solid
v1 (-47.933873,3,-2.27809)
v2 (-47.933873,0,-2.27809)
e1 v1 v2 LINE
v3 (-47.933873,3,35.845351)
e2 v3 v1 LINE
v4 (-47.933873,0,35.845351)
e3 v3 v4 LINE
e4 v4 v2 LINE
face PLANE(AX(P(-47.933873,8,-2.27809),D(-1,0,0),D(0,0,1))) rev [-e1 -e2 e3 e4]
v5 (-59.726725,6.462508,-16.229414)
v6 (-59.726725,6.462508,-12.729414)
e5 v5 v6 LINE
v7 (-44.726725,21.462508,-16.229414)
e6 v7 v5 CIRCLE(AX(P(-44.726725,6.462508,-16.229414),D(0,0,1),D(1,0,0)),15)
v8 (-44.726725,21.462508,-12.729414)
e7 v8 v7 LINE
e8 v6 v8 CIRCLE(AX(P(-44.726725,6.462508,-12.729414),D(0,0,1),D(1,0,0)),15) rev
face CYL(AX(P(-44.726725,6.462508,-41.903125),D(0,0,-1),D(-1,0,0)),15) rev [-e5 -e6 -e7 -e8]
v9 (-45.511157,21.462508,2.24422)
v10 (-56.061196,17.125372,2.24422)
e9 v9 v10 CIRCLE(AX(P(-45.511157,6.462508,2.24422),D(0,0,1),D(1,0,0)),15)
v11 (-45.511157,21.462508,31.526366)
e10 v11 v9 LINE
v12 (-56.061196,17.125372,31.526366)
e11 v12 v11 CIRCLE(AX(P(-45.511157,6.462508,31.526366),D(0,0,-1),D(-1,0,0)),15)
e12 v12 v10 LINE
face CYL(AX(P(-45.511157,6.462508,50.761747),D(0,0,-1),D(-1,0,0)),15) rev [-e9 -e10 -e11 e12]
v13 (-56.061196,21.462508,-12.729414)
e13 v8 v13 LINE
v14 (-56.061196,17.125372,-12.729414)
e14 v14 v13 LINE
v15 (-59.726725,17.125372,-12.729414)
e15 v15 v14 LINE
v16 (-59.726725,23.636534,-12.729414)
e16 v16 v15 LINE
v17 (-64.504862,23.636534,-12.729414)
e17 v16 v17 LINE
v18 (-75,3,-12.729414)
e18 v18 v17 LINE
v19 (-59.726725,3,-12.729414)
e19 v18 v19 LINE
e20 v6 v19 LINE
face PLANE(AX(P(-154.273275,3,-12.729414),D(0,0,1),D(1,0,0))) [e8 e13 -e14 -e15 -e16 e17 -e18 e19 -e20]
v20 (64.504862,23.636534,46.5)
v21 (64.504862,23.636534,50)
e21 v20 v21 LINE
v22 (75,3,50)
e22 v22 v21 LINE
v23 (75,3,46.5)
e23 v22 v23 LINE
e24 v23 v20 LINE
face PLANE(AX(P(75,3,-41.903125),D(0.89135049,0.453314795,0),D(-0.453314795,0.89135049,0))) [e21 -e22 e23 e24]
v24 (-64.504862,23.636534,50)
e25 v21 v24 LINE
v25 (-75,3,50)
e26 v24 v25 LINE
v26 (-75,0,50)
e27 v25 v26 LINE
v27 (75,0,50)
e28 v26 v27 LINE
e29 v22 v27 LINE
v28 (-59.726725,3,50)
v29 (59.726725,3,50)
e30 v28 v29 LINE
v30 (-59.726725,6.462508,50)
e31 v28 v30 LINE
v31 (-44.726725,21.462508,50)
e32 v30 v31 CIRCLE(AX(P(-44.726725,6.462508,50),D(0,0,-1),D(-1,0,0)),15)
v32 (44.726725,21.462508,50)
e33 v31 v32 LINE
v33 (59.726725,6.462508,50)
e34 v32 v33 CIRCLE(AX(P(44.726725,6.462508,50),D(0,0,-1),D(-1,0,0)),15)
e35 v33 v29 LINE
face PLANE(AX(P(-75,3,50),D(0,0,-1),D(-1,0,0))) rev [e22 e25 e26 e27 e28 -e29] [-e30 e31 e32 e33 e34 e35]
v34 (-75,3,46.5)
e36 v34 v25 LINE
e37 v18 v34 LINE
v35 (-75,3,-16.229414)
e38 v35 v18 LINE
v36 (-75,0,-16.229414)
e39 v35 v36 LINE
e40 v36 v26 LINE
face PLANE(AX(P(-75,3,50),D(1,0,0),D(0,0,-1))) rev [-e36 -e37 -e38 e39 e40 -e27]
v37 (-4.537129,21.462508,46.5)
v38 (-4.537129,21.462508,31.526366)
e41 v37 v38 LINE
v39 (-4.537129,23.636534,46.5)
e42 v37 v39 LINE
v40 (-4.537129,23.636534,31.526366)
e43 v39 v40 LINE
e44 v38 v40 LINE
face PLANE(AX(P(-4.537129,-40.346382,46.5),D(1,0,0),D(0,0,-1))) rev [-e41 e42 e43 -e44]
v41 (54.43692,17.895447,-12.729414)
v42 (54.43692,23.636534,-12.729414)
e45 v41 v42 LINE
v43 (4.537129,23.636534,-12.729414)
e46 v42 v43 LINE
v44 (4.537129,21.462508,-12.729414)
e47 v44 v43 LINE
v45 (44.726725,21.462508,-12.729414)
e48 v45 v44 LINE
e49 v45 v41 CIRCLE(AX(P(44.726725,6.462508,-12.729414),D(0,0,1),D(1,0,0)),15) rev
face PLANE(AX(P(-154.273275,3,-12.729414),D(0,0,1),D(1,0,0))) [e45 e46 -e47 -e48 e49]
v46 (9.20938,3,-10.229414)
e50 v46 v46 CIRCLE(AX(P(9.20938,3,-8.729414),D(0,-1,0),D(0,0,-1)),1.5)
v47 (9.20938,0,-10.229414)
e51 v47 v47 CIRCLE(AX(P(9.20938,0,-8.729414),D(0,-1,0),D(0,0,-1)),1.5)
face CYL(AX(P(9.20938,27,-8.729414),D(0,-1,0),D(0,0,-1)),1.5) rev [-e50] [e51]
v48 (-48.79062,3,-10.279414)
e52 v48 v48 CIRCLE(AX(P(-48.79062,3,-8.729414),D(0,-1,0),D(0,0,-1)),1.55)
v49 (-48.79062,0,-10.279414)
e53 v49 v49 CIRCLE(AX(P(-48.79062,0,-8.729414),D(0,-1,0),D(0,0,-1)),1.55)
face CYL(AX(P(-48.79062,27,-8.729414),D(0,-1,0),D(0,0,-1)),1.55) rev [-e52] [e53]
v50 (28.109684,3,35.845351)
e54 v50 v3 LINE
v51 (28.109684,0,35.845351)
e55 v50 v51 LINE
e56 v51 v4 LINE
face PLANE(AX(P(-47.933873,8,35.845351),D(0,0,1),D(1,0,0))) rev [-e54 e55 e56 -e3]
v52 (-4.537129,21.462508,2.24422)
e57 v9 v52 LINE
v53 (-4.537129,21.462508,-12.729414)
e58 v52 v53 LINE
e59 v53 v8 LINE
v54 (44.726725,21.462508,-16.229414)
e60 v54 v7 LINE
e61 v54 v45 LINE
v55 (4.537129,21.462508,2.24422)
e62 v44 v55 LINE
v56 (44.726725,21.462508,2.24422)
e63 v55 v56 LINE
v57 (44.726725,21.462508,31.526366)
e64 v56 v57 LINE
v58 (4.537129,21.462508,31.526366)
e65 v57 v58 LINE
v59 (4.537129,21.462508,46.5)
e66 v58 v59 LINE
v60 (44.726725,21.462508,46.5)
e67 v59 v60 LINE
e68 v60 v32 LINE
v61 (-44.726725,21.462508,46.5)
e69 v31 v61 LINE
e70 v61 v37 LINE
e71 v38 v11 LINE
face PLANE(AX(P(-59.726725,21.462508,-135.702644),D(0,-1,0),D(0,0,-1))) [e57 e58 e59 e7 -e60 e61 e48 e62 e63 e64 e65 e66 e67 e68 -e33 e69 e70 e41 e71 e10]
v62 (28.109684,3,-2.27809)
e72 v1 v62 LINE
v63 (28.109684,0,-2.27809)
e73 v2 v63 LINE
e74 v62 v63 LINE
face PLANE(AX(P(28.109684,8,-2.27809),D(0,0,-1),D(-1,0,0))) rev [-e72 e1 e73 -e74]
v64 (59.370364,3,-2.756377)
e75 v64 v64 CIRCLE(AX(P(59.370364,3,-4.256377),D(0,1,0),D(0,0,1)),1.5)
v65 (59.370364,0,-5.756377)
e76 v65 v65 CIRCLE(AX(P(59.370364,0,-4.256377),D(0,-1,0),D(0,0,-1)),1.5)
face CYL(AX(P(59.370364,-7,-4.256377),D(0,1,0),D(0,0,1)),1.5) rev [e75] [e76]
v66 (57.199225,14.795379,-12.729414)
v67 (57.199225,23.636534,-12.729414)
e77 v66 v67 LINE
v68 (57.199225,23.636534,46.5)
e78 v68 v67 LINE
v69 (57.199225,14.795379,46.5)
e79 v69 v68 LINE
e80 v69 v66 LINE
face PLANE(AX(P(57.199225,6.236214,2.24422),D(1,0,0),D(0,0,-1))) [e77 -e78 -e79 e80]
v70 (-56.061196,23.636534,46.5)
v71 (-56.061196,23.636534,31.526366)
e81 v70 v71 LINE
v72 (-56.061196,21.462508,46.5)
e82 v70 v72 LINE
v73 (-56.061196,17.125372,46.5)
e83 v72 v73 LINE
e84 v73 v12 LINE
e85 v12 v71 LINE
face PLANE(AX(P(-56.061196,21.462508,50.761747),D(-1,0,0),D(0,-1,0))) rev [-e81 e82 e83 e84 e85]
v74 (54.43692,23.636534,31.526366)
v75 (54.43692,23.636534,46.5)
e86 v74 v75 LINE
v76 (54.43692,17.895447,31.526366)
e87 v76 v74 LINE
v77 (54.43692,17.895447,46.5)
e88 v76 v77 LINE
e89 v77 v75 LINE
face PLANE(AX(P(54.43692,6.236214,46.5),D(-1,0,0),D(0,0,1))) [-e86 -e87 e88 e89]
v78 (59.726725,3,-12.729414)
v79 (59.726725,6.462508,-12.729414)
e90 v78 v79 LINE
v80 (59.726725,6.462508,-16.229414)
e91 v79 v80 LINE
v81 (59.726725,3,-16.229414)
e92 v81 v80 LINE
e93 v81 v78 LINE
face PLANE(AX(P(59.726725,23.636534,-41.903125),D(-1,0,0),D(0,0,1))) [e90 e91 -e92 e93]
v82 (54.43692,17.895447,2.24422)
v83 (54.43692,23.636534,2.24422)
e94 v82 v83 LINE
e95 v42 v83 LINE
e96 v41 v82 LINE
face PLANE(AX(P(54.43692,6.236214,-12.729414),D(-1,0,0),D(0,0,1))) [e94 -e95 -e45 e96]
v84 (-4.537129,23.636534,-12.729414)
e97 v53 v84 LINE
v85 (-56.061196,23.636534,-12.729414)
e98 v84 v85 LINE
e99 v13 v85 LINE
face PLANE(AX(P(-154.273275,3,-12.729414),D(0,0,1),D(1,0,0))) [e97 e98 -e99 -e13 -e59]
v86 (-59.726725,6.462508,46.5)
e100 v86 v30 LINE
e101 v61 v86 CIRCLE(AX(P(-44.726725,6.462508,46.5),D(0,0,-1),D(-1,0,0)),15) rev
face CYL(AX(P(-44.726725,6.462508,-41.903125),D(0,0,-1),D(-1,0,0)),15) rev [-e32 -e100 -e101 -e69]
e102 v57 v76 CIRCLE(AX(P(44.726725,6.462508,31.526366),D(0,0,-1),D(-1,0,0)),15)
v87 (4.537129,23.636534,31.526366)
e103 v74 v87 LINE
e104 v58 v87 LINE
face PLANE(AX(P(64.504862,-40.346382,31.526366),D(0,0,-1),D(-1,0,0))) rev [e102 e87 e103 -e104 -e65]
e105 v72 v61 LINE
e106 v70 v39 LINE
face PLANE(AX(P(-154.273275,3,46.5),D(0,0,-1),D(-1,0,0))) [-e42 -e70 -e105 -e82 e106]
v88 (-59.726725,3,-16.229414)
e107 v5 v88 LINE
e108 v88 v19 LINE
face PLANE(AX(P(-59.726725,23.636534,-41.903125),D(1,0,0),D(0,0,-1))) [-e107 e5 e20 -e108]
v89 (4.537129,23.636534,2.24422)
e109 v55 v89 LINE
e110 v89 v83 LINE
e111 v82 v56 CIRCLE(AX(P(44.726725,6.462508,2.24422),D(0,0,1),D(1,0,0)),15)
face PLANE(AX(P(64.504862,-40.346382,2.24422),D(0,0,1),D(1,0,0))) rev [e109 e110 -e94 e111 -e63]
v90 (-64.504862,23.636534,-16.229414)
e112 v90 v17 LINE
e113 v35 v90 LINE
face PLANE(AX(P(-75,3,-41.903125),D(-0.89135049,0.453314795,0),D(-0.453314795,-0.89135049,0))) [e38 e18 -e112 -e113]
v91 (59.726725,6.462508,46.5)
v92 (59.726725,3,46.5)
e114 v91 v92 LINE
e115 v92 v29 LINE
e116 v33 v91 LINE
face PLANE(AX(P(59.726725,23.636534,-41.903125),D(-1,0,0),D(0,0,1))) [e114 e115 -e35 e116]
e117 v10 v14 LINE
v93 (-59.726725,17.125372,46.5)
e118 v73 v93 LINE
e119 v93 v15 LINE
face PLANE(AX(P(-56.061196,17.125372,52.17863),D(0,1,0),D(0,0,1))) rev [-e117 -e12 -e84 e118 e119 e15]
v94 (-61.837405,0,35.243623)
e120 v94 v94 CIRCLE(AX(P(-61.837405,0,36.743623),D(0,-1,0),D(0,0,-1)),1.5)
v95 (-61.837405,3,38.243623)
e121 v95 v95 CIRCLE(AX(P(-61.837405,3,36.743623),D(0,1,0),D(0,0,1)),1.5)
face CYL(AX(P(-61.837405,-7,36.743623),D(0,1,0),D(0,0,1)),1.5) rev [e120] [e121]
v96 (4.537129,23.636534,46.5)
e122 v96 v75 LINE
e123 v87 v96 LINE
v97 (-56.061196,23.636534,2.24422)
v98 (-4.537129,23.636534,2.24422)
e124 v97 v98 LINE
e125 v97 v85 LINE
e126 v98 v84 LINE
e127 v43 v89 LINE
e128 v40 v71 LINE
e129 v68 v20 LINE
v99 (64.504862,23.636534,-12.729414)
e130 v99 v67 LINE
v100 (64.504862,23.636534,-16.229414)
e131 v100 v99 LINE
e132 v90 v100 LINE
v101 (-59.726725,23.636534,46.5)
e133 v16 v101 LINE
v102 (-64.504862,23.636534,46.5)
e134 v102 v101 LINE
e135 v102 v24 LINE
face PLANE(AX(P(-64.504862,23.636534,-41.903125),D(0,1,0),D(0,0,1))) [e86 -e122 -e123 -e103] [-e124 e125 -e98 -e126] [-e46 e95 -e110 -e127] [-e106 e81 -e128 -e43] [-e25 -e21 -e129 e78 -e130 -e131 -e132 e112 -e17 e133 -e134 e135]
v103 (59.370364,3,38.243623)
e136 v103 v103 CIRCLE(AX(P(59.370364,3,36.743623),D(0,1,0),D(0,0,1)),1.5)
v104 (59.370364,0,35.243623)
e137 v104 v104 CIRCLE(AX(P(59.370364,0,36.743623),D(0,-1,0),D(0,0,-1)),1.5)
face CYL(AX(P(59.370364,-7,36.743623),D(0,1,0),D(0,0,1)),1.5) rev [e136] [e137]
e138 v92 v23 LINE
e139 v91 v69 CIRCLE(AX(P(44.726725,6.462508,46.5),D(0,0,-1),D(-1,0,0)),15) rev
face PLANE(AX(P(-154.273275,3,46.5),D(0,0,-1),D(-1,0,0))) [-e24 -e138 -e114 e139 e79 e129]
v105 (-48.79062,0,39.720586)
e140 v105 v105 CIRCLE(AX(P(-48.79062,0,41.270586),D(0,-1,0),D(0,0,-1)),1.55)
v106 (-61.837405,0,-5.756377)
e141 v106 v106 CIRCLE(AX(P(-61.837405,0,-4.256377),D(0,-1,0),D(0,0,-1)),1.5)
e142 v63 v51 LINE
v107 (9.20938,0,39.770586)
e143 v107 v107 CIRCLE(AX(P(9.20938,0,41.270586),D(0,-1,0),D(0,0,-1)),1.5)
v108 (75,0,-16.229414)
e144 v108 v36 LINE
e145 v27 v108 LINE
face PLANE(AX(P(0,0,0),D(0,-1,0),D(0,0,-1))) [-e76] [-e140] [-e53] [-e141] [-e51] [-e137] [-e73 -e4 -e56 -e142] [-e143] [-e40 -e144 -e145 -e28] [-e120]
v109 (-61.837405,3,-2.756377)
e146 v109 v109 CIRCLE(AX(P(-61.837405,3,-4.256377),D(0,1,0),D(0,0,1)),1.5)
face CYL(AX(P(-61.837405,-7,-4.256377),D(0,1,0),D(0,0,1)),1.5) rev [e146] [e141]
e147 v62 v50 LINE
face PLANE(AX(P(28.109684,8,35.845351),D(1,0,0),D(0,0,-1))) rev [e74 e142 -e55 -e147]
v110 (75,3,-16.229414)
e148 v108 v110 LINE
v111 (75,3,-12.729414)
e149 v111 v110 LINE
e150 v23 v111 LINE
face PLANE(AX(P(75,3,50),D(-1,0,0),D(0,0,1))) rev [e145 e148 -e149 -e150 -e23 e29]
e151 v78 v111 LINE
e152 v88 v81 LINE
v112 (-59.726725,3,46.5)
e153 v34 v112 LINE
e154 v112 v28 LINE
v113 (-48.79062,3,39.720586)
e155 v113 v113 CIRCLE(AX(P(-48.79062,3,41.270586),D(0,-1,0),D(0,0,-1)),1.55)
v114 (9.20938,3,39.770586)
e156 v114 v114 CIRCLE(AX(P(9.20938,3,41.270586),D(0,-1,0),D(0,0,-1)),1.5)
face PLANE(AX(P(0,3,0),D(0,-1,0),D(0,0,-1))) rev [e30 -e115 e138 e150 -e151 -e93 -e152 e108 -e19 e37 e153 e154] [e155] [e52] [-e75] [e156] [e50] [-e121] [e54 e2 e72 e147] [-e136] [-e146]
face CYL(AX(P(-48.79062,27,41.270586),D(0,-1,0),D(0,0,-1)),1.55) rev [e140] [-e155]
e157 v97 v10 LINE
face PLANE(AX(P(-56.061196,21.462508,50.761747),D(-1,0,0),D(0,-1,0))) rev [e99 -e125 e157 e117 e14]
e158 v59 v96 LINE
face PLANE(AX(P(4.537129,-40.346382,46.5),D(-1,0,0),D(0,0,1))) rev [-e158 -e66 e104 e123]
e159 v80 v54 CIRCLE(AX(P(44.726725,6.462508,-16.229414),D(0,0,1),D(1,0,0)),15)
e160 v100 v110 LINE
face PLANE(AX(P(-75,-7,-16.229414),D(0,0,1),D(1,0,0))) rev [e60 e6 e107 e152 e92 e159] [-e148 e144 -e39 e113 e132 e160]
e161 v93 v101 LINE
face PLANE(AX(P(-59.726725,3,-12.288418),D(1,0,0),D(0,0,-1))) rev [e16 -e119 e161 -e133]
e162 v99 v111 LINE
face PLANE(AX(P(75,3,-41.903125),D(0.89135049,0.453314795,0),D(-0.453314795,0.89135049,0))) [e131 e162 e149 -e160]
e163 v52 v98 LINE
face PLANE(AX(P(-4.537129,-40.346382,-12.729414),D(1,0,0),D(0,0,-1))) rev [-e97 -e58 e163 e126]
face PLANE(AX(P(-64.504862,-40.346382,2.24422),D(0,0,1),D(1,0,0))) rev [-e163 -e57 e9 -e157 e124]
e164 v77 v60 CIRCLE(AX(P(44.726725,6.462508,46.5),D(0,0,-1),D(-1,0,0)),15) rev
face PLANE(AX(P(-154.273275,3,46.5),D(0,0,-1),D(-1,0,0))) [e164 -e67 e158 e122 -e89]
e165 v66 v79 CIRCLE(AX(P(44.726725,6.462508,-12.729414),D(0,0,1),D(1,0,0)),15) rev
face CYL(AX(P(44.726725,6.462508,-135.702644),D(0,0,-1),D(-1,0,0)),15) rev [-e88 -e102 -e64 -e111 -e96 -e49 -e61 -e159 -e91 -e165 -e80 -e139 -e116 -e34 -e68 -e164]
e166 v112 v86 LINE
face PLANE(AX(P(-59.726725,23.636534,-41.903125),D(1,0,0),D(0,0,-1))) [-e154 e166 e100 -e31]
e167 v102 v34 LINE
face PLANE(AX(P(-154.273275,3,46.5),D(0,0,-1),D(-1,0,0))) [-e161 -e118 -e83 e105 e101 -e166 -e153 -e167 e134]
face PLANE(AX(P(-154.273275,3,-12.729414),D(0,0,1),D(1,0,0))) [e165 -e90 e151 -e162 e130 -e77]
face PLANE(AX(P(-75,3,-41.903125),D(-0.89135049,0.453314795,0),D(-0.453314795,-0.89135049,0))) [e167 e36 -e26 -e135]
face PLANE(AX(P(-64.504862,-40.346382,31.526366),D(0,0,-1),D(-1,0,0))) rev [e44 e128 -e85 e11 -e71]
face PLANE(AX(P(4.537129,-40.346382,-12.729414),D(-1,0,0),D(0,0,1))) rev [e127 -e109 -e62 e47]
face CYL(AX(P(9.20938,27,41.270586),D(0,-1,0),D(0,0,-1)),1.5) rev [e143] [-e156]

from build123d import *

# Parameters (mm, degrees)
SKETCH_1_W               = 150
SKETCH_1_H               = 100
EXTRUDE_1_DEPTH          = 3
CUT_EXTRUDE_1_DEPTH      = 10
SKETCH_4_R               = 1.5
CUT_EXTRUDE_2_DEPTH      = 10
CUT_EXTRUDE_3_DEPTH      = 10
EXTRUDE_2_REACH          = 102.102
CUT_EXTRUDE_4_DEPTH      = 214
CUT_EXTRUDE_4_DEPTH_BACK = 24
SKETCH_8_W               = 26.114706757
SKETCH_8_H               = 20.636533531
SKETCH_11_R              = 1.55
SKETCH_11_R_2            = 1.5
CUT_EXTRUDE_5_DEPTH      = 27
EXTRUDE_START            = -66.229414
SKETCH_12_W              = 119.453449028
SKETCH_12_H              = 2.174025896
EXTRUDE_3_DEPTH          = 66.229414
EXTRUDE_START_2          = -2.174026
SKETCH_13_W              = 4.778137961
SKETCH_13_H              = 26.114706757
EXTRUDE_4_DEPTH          = 2.174026
CUT_EXTRUDE_6_DEPTH      = 2.174025896
CUT_EXTRUDE_8_DEPTH      = 7
SKETCH_18_W              = 4.778137961
SKETCH_18_H              = 2.174025896
CUT_EXTRUDE_9_DEPTH      = 29.282146497
SKETCH_19_W              = 3.665528499
SKETCH_19_H              = 2.174025896
EXTRUDE_7_DEPTH          = 59.229414
SKETCH_20_W              = 2.762304407
SKETCH_20_H              = 14.973633508
EXTRUDE_8_DEPTH          = 2.174025896
SKETCH_21_W              = 4.846380184
SKETCH_21_H              = 29.282146498
CUT_EXTRUDE_10_DEPTH     = 2.174025896
FILLET_3_R               = 15
SKETCH_22_W              = 3.665528499
SKETCH_22_H              = 4.33713538
EXTRUDE_9_DEPTH          = 59.229413514
FILLET_4_R               = 15
SKETCH_23_W              = 76.043557339
SKETCH_23_H              = 38.123441179
CUT_EXTRUDE_11_DEPTH     = 8


with BuildPart() as part:
    # 草图1 → 凸台-拉伸1 (new body)
    with BuildSketch(Plane(origin=(0, 0, 0), x_dir=(1, 0, 0), z_dir=(0, 1, 0))):
        Rectangle(SKETCH_1_W, SKETCH_1_H)
    extrude(amount=EXTRUDE_1_DEPTH)

    # 草图2 → 切除-拉伸1 (cut)
    with BuildSketch(Plane(origin=(0, 3, 0), x_dir=(1, 0, 0), z_dir=(0, 1, 0))):
        Polygon((-75, 25.450950707), (82.438645769, 25.450950707), (82.438645769, 50), (45.243784289, 69.01769232), (-35.190103662, 62.508591561), (-89.149345597, 58.141947705), align=None)
    extrude(amount=-CUT_EXTRUDE_1_DEPTH, mode=Mode.SUBTRACT)

    # 草图4 → 切除-拉伸2 (cut)
    with BuildSketch(Plane(origin=(0, 3, 0), x_dir=(1, 0, 0), z_dir=(0, 1, 0))):
        with Locations(Location((59.370364421, 4.256376577, 0), (0, 0, 270))):
            Circle(SKETCH_4_R)
        with Locations(Location((59.370364421, -36.743623423, 0), (0, 0, 270))):
            Circle(SKETCH_4_R)
        with Locations(Location((-61.837405042, -36.743623423, 0), (0, 0, 270))):
            Circle(SKETCH_4_R)
        with Locations(Location((-61.837405042, 4.256376577, 0), (0, 0, 270))):
            Circle(SKETCH_4_R)
    extrude(amount=-CUT_EXTRUDE_2_DEPTH, mode=Mode.SUBTRACT)

    # 草图5 → 切除-拉伸3 (cut)
    with BuildSketch(Plane(origin=(0, 3, 0), x_dir=(1, 0, 0), z_dir=(0, 1, 0))):
        Polygon((-75, 16.229413514), (82.270873699, 16.229413514), (82.270873699, 33.668010185), (-81.615992849, 33.668010185), (-81.615992849, 16.229413514), align=None)
    extrude(amount=-CUT_EXTRUDE_3_DEPTH, mode=Mode.SUBTRACT)

    # 凸台-拉伸2: up to this face of the body (flat: up to its plane)
    extrude_2_end = Plane(part.part.faces().sort_by_distance((0, 1.5, -16.229413514))[0])
    # 草图6 → 凸台-拉伸2 (add, up to the picked face)
    with BuildSketch(Plane.XY.offset(50), mode=Mode.PRIVATE) as extrude_2_sk1:
        Polygon((-75, 3), (-64.504862475, 23.636533531), (-59.726724514, 23.636533531), (-59.726724514, 3), align=None)
    extrude_2_tool1 = split(extrude(extrude_2_sk1.sketch, amount=-EXTRUDE_2_REACH, mode=Mode.PRIVATE), bisect_by=extrude_2_end, keep=Keep.BOTH, mode=Mode.PRIVATE)
    # 草图6 → 凸台-拉伸2 (add, up to the picked face)
    with BuildSketch(Plane.XY.offset(50), mode=Mode.PRIVATE) as extrude_2_sk2:
        Polygon((59.726724514, 23.636533531), (59.726724514, 3), (75, 3), (64.504862475, 23.636533531), align=None)
    extrude_2_tool2 = split(extrude(extrude_2_sk2.sketch, amount=-EXTRUDE_2_REACH, mode=Mode.PRIVATE), bisect_by=extrude_2_end, keep=Keep.BOTH, mode=Mode.PRIVATE)
    add(extrude_2_tool1.solids().sort_by(Axis((-65.197351, 11.518034, 50), (0, 0, -1)))[0])
    add(extrude_2_tool2.solids().sort_by(Axis((65.197351, 11.518034, 50), (0, 0, -1)))[0])

    # 草图8 → 切除-拉伸4 (cut, two sides: drawn at the far end of the back side and taken through both)
    with BuildSketch(Plane.ZY.offset(-59.726724514).offset(-CUT_EXTRUDE_4_DEPTH_BACK)):
        with Locations((0.327939865, 13.318266766)):
            Rectangle(SKETCH_8_W, SKETCH_8_H)
        with Locations((33.442646622, 13.318266766)):
            Rectangle(SKETCH_8_W, SKETCH_8_H)
    extrude(amount=CUT_EXTRUDE_4_DEPTH + CUT_EXTRUDE_4_DEPTH_BACK, mode=Mode.SUBTRACT)

    # 草图11 → 切除-拉伸5 (cut)
    with BuildSketch(Plane.XZ):
        with Locations(Location((-48.790619751, 41.270586486, 0), (0, 0, 270))):
            Circle(SKETCH_11_R)
        with Locations(Location((9.209380249, 41.270586486, 0), (0, 0, 270))):
            Circle(SKETCH_11_R_2)
        with Locations(Location((-48.790619751, -8.729413514, 0), (0, 0, 270))):
            Circle(SKETCH_11_R)
        with Locations(Location((9.209380249, -8.729413514, 0), (0, 0, 270))):
            Circle(SKETCH_11_R_2)
    extrude(amount=-CUT_EXTRUDE_5_DEPTH, mode=Mode.SUBTRACT)

    # 草图12 → 凸台-拉伸3 (add)
    with BuildSketch(Plane.XY.offset(50).offset(EXTRUDE_START)):
        with Locations((0, 22.549520583)):
            Rectangle(SKETCH_12_W, SKETCH_12_H)
    extrude(amount=EXTRUDE_3_DEPTH)

    # 草图13 → 凸台-拉伸4 (add)
    with BuildSketch(Plane(origin=(0, 23.636533531, 0), x_dir=(1, 0, 0), z_dir=(0, 1, 0)).offset(EXTRUDE_START_2)):
        with Locations((-62.115793495, -0.327939865)):
            Rectangle(SKETCH_13_W, SKETCH_13_H)
        with Locations((-62.115793495, -33.442646622)):
            Rectangle(SKETCH_13_W, SKETCH_13_H)
        with Locations((62.115793495, -33.442646622)):
            Rectangle(SKETCH_13_W, SKETCH_13_H)
        with Locations((62.115793495, -0.327939865)):
            Rectangle(SKETCH_13_W, SKETCH_13_H)
    extrude(amount=EXTRUDE_4_DEPTH)

    # 草图14 → 切除-拉伸6 (cut)
    with BuildSketch(Plane(origin=(0, 23.636533531, 0), x_dir=(1, 0, 0), z_dir=(0, 1, 0))):
        Polygon((-59.726724514, 12.729413514), (-4.537128548, 12.729413514), (-4.537128548, -2.244219994), (-64.504862475, -2.244219994), (-64.504862475, 12.729413514), align=None)
        Polygon((64.504862475, -2.244219994), (4.537128548, -2.244219994), (4.537128548, 12.729413514), (59.726724514, 12.729413514), (64.504862475, 12.729413514), align=None)
        Polygon((59.726724514, -46.5), (4.537128548, -46.5), (4.537128548, -31.526366492), (64.504862475, -31.526366492), (64.504862475, -46.5), align=None)
        Polygon((-64.504862475, -31.526366492), (-4.537128548, -31.526366492), (-4.537128548, -46.5), (-59.726724514, -46.5), (-64.504862475, -46.5), align=None)
    extrude(amount=-CUT_EXTRUDE_6_DEPTH, mode=Mode.SUBTRACT)

    # 草图16 → 切除-拉伸8 (cut)
    with BuildSketch(Plane.XY.offset(20.385293243)):
        Polygon((-64.504862475, 23.636533531), (-75, 3), (-59.726724514, 3), (-59.726724514, 23.636533531), align=None)
        Polygon((59.726724514, 23.636533531), (64.504862475, 23.636533531), (75, 3), (59.726724514, 3), align=None)
    extrude(amount=-CUT_EXTRUDE_8_DEPTH, mode=Mode.SUBTRACT)

    # 草图18 → 切除-拉伸9 (cut)
    with BuildSketch(Plane.XY.offset(31.526366492)):
        with Locations((-62.115793495, 22.549520583)):
            Rectangle(SKETCH_18_W, SKETCH_18_H)
        with Locations((62.115793495, 22.549520583)):
            Rectangle(SKETCH_18_W, SKETCH_18_H)
    extrude(amount=-CUT_EXTRUDE_9_DEPTH, mode=Mode.SUBTRACT)

    # 草图19 → 凸台-拉伸7 (add)
    with BuildSketch(Plane.XY.offset(-12.729413514)):
        with Locations((-57.893960265, 22.549520583)):
            Rectangle(SKETCH_19_W, SKETCH_19_H)
    extrude(amount=EXTRUDE_7_DEPTH)

    # 草图20 → 凸台-拉伸8 (add)
    with BuildSketch(Plane(origin=(0, 23.636533531, 0), x_dir=(1, 0, 0), z_dir=(0, 1, 0))):
        with Locations((55.818072582, 5.24259676)):
            Rectangle(SKETCH_20_W, SKETCH_20_H)
        with Locations((55.818072582, -39.013183246)):
            Rectangle(SKETCH_20_W, SKETCH_20_H)
    extrude(amount=-EXTRUDE_8_DEPTH)

    # 草图21 → 切除-拉伸10 (cut)
    with BuildSketch(Plane(origin=(0, 23.636533531, 0), x_dir=(1, 0, 0), z_dir=(0, 1, 0))):
        with Locations((59.622414877, -16.885293243)):
            Rectangle(SKETCH_21_W, SKETCH_21_H)
    extrude(amount=-CUT_EXTRUDE_10_DEPTH, mode=Mode.SUBTRACT)

    # 圆角3
    # the kernel refuses this fillet: 15 mm, written as the material it adds along each edge
    with BuildSketch(Plane(origin=(-59.726724514, 21.462507635, 9.000000486), x_dir=(1, 0, 0), z_dir=(0, 0, 1))) as fillet_3_piece_1_section:
        with BuildLine():
            CenterArc((FILLET_3_R, -FILLET_3_R), FILLET_3_R, 90, 90)
            Line((0, -FILLET_3_R), (0, 0))
            Line((0, 0), (FILLET_3_R, 0))
        make_face()
    fillet_3_piece_1 = extrude(amount=40.999999514, mode=Mode.PRIVATE)
    fillet_3_piece_1 = split(fillet_3_piece_1, bisect_by=Plane(origin=(-53.334627801, 19.96988212, 46.5), z_dir=(0, 0, 1)), keep=Keep.TOP, mode=Mode.PRIVATE)
    add(fillet_3_piece_1)
    with BuildSketch(Plane(origin=(-59.726724514, 21.462507635, -16.229413514), x_dir=(1, 0, 0), z_dir=(0, 0, 1))) as fillet_3_piece_2:
        with BuildLine():
            CenterArc((FILLET_3_R, -FILLET_3_R), FILLET_3_R, 90, 90)
            Line((0, -FILLET_3_R), (0, 0))
            Line((0, 0), (FILLET_3_R, 0))
        make_face()
    extrude(amount=3.5)
    with BuildSketch(Plane(origin=(59.726724514, 21.462507635, -16.229413514), x_dir=(-1, 0, 0), z_dir=(0, 0, 1)), Plane(origin=(59.726724514, 21.462507635, 46.5), x_dir=(-1, 0, 0), z_dir=(0, 0, 1))) as fillet_3_piece_3:
        with BuildLine():
            CenterArc((FILLET_3_R, FILLET_3_R), FILLET_3_R, 180, 90)
            Line((0, FILLET_3_R), (0, 0))
            Line((0, 0), (FILLET_3_R, 0))
        make_face()
    extrude(amount=3.5)
    with BuildSketch(Plane(origin=(59.726724514, 21.462507635, -16.229413514), x_dir=(-1, 0, 0), z_dir=(0, 0, 1))) as fillet_3_piece_4_section:
        with BuildLine():
            CenterArc((FILLET_3_R, FILLET_3_R), FILLET_3_R, 180, 90)
            Line((0, FILLET_3_R), (0, 0))
            Line((0, 0), (FILLET_3_R, 0))
        make_face()
    fillet_3_piece_4 = extrude(amount=41, mode=Mode.PRIVATE)
    fillet_3_piece_4 = split(fillet_3_piece_4, bisect_by=Plane(origin=(54.436920378, 18.896822282, -5.24259676), z_dir=(1, 0, 0)), keep=Keep.TOP, mode=Mode.PRIVATE)
    fillet_3_piece_4 = split(fillet_3_piece_4, bisect_by=Plane(origin=(57.199224785, 18.896822282, -5.24259676), z_dir=(-1, 0, 0)), keep=Keep.TOP, mode=Mode.PRIVATE)
    add(fillet_3_piece_4)
    with BuildSketch(Plane(origin=(59.726724514, 21.462507635, -53.729413514), x_dir=(-1, 0, 0), z_dir=(0, 0, 1))) as fillet_3_piece_5_section:
        with BuildLine():
            CenterArc((FILLET_3_R, FILLET_3_R), FILLET_3_R, 180, 90)
            Line((0, FILLET_3_R), (0, 0))
            Line((0, 0), (FILLET_3_R, 0))
        make_face()
    fillet_3_piece_5 = extrude(amount=78.5, mode=Mode.PRIVATE)
    fillet_3_piece_5 = split(fillet_3_piece_5, bisect_by=Plane(origin=(52.070892236, 20.41839557, 2.244219994), z_dir=(0, 0, 1)), keep=Keep.TOP, mode=Mode.PRIVATE)
    fillet_3_piece_5 = split(fillet_3_piece_5, bisect_by=Plane(origin=(57.199224785, 20.41839557, 13.50740324), z_dir=(-1, 0, 0)), keep=Keep.TOP, mode=Mode.PRIVATE)
    add(fillet_3_piece_5)
    with BuildSketch(Plane(origin=(59.726724514, 21.462507635, 9), x_dir=(-1, 0, 0), z_dir=(0, 0, 1))) as fillet_3_piece_6_section:
        with BuildLine():
            CenterArc((FILLET_3_R, FILLET_3_R), FILLET_3_R, 180, 90)
            Line((0, FILLET_3_R), (0, 0))
            Line((0, 0), (FILLET_3_R, 0))
        make_face()
    fillet_3_piece_6 = extrude(amount=78.5, mode=Mode.PRIVATE)
    fillet_3_piece_6 = split(fillet_3_piece_6, bisect_by=Plane(origin=(52.070892236, 20.41839557, 31.526366492), z_dir=(0, 0, -1)), keep=Keep.TOP, mode=Mode.PRIVATE)
    fillet_3_piece_6 = split(fillet_3_piece_6, bisect_by=Plane(origin=(57.199224785, 20.41839557, 20.263183246), z_dir=(-1, 0, 0)), keep=Keep.TOP, mode=Mode.PRIVATE)
    add(fillet_3_piece_6)
    with BuildSketch(Plane(origin=(59.726724514, 21.462507635, 9), x_dir=(-1, 0, 0), z_dir=(0, 0, 1))) as fillet_3_piece_7_section:
        with BuildLine():
            CenterArc((FILLET_3_R, FILLET_3_R), FILLET_3_R, 180, 90)
            Line((0, FILLET_3_R), (0, 0))
            Line((0, 0), (FILLET_3_R, 0))
        make_face()
    fillet_3_piece_7 = extrude(amount=41, mode=Mode.PRIVATE)
    fillet_3_piece_7 = split(fillet_3_piece_7, bisect_by=Plane(origin=(54.436920378, 18.896822282, 39.013183246), z_dir=(1, 0, 0)), keep=Keep.TOP, mode=Mode.PRIVATE)
    fillet_3_piece_7 = split(fillet_3_piece_7, bisect_by=Plane(origin=(57.199224785, 18.896822282, 39.013183246), z_dir=(-1, 0, 0)), keep=Keep.TOP, mode=Mode.PRIVATE)
    add(fillet_3_piece_7)

    # 草图22 → 凸台-拉伸9 (add)
    with BuildSketch(Plane.XY.offset(-12.729413514)):
        with Locations((-57.893960265, 19.293939945)):
            Rectangle(SKETCH_22_W, SKETCH_22_H)
    extrude(amount=EXTRUDE_9_DEPTH)

    # 圆角4
    # the kernel refuses this fillet: 15 mm, written as the material it adds along each edge
    with BuildSketch(Plane(origin=(-56.061196015, 21.462507635, 2.244219994), x_dir=(0, -1, 0), z_dir=(0, 0, 1))) as fillet_4_piece_1:
        with BuildLine():
            CenterArc((15, 10.550038772), FILLET_4_R, 180, 44.695261707)
            Line((0, 10.550038772), (-0.3, 10.550038772))
            Line((-0.3, 10.550038772), (-0.3, 0))
            Line((-0.3, 0), (0, -0.3))
            ThreePointArc((0, -0.3), (2.16856769, -0.3), (4.123878087, -0.211000775))
            Line((4.123878087, -0.211000775), (4.33713538, 0))
        make_face()
    extrude(amount=29.282146497)

    # 草图23 → 切除-拉伸11 (cut)
    with BuildSketch(Plane.XZ):
        with Locations((-9.912094706, 16.783630734)):
            Rectangle(SKETCH_23_W, SKETCH_23_H)
    extrude(amount=-CUT_EXTRUDE_11_DEPTH, mode=Mode.SUBTRACT)


solid = part.part
